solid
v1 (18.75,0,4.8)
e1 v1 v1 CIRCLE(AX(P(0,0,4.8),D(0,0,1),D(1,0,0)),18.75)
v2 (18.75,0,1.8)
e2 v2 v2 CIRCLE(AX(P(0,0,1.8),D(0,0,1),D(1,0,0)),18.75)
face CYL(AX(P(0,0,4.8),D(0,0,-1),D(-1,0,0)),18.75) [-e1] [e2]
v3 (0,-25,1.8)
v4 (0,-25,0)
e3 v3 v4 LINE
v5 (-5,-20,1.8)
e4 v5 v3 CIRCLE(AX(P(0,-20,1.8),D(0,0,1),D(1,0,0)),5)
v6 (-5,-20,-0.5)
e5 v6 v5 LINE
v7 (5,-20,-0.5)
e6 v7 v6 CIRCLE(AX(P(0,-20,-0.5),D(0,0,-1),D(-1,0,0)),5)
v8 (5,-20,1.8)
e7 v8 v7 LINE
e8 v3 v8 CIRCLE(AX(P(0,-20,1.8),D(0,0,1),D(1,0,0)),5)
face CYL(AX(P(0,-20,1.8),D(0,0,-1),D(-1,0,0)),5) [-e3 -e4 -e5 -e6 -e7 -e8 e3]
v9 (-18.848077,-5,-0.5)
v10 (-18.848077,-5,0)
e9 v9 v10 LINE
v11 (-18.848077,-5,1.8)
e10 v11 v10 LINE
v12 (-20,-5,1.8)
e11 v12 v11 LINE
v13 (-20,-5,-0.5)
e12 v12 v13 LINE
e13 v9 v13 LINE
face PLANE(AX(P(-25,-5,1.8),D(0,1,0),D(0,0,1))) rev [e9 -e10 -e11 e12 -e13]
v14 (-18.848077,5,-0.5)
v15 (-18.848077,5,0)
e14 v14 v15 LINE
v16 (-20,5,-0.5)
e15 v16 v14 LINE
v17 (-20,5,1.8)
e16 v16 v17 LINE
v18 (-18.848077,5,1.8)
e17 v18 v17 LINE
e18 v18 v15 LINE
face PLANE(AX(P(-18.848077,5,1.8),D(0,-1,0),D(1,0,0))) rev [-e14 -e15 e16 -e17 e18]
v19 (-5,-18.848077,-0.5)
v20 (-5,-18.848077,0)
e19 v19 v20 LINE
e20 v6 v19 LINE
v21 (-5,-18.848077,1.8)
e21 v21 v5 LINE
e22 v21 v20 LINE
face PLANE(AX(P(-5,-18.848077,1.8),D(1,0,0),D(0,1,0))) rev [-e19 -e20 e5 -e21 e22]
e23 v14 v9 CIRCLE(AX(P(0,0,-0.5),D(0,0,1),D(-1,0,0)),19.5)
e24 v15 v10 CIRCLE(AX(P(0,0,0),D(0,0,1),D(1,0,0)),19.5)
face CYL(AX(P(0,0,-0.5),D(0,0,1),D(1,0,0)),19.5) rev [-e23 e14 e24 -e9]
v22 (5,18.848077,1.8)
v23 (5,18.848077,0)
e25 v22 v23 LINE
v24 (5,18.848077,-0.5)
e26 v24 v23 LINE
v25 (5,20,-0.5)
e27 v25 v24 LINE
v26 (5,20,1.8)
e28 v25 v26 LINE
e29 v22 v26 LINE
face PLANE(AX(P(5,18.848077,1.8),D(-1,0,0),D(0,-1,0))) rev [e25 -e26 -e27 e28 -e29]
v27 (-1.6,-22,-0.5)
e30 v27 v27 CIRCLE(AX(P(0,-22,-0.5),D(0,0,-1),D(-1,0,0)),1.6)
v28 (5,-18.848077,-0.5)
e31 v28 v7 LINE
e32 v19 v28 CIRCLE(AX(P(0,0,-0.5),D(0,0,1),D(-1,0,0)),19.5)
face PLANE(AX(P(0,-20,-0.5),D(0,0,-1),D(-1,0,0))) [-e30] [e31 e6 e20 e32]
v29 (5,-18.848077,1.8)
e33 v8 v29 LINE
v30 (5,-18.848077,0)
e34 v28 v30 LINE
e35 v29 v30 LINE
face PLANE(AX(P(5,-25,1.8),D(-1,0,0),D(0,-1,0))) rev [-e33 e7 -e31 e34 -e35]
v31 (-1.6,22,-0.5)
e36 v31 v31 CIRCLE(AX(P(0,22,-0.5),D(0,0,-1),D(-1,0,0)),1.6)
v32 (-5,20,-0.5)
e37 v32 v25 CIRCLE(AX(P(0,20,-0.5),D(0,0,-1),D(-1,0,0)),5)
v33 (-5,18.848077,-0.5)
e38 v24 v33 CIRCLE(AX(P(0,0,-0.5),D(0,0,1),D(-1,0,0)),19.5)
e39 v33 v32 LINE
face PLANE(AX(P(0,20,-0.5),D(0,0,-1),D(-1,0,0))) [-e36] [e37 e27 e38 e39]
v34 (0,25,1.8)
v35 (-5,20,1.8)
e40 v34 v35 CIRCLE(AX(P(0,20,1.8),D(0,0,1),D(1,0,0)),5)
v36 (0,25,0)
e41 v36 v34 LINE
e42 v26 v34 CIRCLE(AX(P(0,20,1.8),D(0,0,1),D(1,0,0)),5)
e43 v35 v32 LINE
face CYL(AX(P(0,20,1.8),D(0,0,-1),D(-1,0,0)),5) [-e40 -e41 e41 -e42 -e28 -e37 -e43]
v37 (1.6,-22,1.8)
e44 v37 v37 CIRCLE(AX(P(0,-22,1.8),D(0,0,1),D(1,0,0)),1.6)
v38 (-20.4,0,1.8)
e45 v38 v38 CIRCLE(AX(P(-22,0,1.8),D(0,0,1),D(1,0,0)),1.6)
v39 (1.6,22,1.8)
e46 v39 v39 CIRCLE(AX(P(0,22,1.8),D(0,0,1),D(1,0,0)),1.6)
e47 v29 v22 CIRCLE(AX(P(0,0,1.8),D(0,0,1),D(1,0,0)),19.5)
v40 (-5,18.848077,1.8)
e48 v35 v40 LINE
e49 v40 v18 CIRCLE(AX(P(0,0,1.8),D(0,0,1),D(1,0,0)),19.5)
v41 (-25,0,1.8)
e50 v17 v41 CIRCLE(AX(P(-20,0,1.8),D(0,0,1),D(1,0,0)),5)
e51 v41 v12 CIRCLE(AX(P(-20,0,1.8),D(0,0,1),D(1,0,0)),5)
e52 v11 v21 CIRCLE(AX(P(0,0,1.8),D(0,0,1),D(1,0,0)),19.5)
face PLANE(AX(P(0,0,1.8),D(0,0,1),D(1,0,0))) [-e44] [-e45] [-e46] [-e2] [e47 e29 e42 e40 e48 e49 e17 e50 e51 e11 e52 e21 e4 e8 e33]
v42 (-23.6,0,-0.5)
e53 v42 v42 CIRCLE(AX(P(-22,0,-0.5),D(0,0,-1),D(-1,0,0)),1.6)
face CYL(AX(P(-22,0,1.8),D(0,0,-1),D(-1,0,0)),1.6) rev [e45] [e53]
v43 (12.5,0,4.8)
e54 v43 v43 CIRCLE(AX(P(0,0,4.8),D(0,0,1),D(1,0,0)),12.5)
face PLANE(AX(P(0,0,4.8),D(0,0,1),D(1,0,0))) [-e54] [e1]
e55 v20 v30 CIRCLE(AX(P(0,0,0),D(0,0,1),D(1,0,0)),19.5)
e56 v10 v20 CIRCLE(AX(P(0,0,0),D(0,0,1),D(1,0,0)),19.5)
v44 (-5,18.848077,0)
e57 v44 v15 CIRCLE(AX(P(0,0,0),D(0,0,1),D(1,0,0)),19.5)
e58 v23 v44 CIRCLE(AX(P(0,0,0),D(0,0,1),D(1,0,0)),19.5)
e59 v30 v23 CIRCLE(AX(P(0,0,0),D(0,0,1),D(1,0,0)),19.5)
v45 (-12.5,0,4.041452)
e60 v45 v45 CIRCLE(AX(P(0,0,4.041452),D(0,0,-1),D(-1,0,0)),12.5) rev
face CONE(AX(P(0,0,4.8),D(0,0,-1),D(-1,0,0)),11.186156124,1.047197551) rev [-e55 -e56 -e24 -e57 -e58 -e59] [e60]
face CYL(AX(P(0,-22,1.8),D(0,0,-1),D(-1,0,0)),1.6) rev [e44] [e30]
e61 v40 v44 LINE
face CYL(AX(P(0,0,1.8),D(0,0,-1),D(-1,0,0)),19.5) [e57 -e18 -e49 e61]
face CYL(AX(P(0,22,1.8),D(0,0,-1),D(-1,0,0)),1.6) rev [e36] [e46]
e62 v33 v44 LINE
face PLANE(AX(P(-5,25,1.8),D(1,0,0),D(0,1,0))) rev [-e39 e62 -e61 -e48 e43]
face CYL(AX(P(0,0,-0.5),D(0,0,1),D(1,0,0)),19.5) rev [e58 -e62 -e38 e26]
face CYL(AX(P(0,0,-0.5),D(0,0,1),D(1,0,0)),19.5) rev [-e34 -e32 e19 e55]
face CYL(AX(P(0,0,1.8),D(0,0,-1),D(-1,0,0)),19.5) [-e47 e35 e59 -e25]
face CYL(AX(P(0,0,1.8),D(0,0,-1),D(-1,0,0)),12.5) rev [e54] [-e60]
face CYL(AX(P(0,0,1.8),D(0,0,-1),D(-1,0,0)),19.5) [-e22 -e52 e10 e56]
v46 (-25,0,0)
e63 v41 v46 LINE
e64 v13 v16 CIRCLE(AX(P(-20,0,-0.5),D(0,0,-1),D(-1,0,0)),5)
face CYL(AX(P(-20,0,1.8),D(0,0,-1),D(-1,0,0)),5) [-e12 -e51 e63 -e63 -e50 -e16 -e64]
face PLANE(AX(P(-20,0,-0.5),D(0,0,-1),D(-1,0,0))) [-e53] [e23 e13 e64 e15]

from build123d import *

# Parameters (mm, degrees)
SKETCH_2_R      = 12.5
SKETCH_2_R_2    = 1.6
EXTRUDE_1_DEPTH = 1.8
FILLET_1_R      = 5
SKETCH_7_R      = 18.75
SKETCH_7_R_2    = 12.5
EXTRUDE_2_DEPTH = 3
EXTRUDE_START   = 0.5
SKETCH_8_R      = 1.6
EXTRUDE_3_DEPTH = 0.5


with BuildPart() as part:
    # 草图2 → 凸台-拉伸1 (new body)
    with BuildSketch(Plane.XY):
        with BuildLine():
            Line((5, 18.848076825), (5, 25))
            Line((5, 25), (-5, 25))
            Line((-5, 25), (-5, 18.848076825))
            ThreePointArc((-5, 18.848076825), (-13.788582233, 13.788582233), (-18.848076825, 5))
            Line((-18.848076825, 5), (-25, 5))
            Line((-25, 5), (-25, -5))
            Line((-25, -5), (-18.848076825, -5))
            ThreePointArc((-18.848076825, -5), (-13.788582233, -13.788582233), (-5, -18.848076825))
            Line((-5, -18.848076825), (-5, -25))
            Line((-5, -25), (5, -25))
            Line((5, -25), (5, -18.848076825))
            ThreePointArc((5, -18.848076825), (19.5, 0), (5, 18.848076825))
        make_face()
        Circle(SKETCH_2_R, mode=Mode.SUBTRACT)
        with Locations((0, 22)):
            Circle(SKETCH_2_R_2, mode=Mode.SUBTRACT)
        with Locations((-22, 0)):
            Circle(SKETCH_2_R_2, mode=Mode.SUBTRACT)
        with Locations((0, -22)):
            Circle(SKETCH_2_R_2, mode=Mode.SUBTRACT)
    extrude(amount=EXTRUDE_1_DEPTH)

    # 圆角1
    fillet_1_edges = [part.edges().sort_by_distance(p)[0] for p in [
        (5, -25, 0.9),
        (-5, -25, 0.9),
        (5, 25, 0.9),
        (-5, 25, 0.9),
        (-25, -5, 0.9),
        (-25, 5, 0.9),
    ]]
    fillet(fillet_1_edges, radius=FILLET_1_R - 0.0001)  # a hair under: the kernel refuses the full size

    # 草图7 → 凸台-拉伸2 (add)
    with BuildSketch(Plane.XY.offset(1.8)):
        Circle(SKETCH_7_R)
        Circle(SKETCH_7_R_2, mode=Mode.SUBTRACT)
    extrude(amount=EXTRUDE_2_DEPTH)

    # 草图3 → 切除-旋转1 (revolve, cut)
    with BuildSketch(Plane(origin=(0, 0, 0), x_dir=(1, 0, 0), z_dir=(0, 1, 0)), mode=Mode.PRIVATE) as cut_revolve_1_sk:
        Polygon((11.186156124, 0), (19.5, 0), (11.186156124, -4.8), align=None)
    revolve(cut_revolve_1_sk.sketch.rotate(Axis((0, 0, 0), (0, 0, -1)), 180), axis=Axis((0, 0, 0), (0, 0, -1)), mode=Mode.SUBTRACT)

    # 草图8 → 凸台-拉伸3 (add)
    # profile 1 of 3: a face of its own
    with BuildSketch(Plane(origin=(0, 0, 0), x_dir=(-1, 0, 0), z_dir=(0, 0, -1)).offset(EXTRUDE_START)):
        with BuildLine():
            Line((-5, 20), (-5, 18.848076825))
            ThreePointArc((-5, 18.848076825), (0, 19.5), (5, 18.848076825))
            Line((5, 18.848076825), (5, 20))
            ThreePointArc((5, 20), (3.535533906, 23.535533906), (0, 25))
            ThreePointArc((0, 25), (-3.535533906, 23.535533906), (-5, 20))
        make_face()
        with Locations((0, 22)):
            Circle(SKETCH_8_R, mode=Mode.SUBTRACT)
    # profile 2 of 3: a face of its own
    with BuildSketch(Plane(origin=(0, 0, 0), x_dir=(-1, 0, 0), z_dir=(0, 0, -1)).offset(EXTRUDE_START)):
        with BuildLine():
            Line((20, 5), (18.848076825, 5))
            ThreePointArc((18.848076825, 5), (19.5, 0), (18.848076825, -5))
            Line((18.848076825, -5), (20, -5))
            ThreePointArc((20, -5), (23.535533906, -3.535533906), (25, 0))
            ThreePointArc((25, 0), (23.535533906, 3.535533906), (20, 5))
        make_face()
        with Locations((22, 0)):
            Circle(SKETCH_8_R, mode=Mode.SUBTRACT)
    # profile 3 of 3: a face of its own
    with BuildSketch(Plane(origin=(0, 0, 0), x_dir=(-1, 0, 0), z_dir=(0, 0, -1)).offset(EXTRUDE_START)):
        with BuildLine():
            Line((5, -20), (5, -18.848076825))
            ThreePointArc((5, -18.848076825), (0, -19.5), (-5, -18.848076825))
            Line((-5, -18.848076825), (-5, -20))
            ThreePointArc((-5, -20), (-3.535533906, -23.535533906), (0, -25))
            ThreePointArc((0, -25), (3.535533906, -23.535533906), (5, -20))
        make_face()
        with Locations((0, -22)):
            Circle(SKETCH_8_R, mode=Mode.SUBTRACT)
    extrude(amount=-EXTRUDE_3_DEPTH)


solid = part.part
